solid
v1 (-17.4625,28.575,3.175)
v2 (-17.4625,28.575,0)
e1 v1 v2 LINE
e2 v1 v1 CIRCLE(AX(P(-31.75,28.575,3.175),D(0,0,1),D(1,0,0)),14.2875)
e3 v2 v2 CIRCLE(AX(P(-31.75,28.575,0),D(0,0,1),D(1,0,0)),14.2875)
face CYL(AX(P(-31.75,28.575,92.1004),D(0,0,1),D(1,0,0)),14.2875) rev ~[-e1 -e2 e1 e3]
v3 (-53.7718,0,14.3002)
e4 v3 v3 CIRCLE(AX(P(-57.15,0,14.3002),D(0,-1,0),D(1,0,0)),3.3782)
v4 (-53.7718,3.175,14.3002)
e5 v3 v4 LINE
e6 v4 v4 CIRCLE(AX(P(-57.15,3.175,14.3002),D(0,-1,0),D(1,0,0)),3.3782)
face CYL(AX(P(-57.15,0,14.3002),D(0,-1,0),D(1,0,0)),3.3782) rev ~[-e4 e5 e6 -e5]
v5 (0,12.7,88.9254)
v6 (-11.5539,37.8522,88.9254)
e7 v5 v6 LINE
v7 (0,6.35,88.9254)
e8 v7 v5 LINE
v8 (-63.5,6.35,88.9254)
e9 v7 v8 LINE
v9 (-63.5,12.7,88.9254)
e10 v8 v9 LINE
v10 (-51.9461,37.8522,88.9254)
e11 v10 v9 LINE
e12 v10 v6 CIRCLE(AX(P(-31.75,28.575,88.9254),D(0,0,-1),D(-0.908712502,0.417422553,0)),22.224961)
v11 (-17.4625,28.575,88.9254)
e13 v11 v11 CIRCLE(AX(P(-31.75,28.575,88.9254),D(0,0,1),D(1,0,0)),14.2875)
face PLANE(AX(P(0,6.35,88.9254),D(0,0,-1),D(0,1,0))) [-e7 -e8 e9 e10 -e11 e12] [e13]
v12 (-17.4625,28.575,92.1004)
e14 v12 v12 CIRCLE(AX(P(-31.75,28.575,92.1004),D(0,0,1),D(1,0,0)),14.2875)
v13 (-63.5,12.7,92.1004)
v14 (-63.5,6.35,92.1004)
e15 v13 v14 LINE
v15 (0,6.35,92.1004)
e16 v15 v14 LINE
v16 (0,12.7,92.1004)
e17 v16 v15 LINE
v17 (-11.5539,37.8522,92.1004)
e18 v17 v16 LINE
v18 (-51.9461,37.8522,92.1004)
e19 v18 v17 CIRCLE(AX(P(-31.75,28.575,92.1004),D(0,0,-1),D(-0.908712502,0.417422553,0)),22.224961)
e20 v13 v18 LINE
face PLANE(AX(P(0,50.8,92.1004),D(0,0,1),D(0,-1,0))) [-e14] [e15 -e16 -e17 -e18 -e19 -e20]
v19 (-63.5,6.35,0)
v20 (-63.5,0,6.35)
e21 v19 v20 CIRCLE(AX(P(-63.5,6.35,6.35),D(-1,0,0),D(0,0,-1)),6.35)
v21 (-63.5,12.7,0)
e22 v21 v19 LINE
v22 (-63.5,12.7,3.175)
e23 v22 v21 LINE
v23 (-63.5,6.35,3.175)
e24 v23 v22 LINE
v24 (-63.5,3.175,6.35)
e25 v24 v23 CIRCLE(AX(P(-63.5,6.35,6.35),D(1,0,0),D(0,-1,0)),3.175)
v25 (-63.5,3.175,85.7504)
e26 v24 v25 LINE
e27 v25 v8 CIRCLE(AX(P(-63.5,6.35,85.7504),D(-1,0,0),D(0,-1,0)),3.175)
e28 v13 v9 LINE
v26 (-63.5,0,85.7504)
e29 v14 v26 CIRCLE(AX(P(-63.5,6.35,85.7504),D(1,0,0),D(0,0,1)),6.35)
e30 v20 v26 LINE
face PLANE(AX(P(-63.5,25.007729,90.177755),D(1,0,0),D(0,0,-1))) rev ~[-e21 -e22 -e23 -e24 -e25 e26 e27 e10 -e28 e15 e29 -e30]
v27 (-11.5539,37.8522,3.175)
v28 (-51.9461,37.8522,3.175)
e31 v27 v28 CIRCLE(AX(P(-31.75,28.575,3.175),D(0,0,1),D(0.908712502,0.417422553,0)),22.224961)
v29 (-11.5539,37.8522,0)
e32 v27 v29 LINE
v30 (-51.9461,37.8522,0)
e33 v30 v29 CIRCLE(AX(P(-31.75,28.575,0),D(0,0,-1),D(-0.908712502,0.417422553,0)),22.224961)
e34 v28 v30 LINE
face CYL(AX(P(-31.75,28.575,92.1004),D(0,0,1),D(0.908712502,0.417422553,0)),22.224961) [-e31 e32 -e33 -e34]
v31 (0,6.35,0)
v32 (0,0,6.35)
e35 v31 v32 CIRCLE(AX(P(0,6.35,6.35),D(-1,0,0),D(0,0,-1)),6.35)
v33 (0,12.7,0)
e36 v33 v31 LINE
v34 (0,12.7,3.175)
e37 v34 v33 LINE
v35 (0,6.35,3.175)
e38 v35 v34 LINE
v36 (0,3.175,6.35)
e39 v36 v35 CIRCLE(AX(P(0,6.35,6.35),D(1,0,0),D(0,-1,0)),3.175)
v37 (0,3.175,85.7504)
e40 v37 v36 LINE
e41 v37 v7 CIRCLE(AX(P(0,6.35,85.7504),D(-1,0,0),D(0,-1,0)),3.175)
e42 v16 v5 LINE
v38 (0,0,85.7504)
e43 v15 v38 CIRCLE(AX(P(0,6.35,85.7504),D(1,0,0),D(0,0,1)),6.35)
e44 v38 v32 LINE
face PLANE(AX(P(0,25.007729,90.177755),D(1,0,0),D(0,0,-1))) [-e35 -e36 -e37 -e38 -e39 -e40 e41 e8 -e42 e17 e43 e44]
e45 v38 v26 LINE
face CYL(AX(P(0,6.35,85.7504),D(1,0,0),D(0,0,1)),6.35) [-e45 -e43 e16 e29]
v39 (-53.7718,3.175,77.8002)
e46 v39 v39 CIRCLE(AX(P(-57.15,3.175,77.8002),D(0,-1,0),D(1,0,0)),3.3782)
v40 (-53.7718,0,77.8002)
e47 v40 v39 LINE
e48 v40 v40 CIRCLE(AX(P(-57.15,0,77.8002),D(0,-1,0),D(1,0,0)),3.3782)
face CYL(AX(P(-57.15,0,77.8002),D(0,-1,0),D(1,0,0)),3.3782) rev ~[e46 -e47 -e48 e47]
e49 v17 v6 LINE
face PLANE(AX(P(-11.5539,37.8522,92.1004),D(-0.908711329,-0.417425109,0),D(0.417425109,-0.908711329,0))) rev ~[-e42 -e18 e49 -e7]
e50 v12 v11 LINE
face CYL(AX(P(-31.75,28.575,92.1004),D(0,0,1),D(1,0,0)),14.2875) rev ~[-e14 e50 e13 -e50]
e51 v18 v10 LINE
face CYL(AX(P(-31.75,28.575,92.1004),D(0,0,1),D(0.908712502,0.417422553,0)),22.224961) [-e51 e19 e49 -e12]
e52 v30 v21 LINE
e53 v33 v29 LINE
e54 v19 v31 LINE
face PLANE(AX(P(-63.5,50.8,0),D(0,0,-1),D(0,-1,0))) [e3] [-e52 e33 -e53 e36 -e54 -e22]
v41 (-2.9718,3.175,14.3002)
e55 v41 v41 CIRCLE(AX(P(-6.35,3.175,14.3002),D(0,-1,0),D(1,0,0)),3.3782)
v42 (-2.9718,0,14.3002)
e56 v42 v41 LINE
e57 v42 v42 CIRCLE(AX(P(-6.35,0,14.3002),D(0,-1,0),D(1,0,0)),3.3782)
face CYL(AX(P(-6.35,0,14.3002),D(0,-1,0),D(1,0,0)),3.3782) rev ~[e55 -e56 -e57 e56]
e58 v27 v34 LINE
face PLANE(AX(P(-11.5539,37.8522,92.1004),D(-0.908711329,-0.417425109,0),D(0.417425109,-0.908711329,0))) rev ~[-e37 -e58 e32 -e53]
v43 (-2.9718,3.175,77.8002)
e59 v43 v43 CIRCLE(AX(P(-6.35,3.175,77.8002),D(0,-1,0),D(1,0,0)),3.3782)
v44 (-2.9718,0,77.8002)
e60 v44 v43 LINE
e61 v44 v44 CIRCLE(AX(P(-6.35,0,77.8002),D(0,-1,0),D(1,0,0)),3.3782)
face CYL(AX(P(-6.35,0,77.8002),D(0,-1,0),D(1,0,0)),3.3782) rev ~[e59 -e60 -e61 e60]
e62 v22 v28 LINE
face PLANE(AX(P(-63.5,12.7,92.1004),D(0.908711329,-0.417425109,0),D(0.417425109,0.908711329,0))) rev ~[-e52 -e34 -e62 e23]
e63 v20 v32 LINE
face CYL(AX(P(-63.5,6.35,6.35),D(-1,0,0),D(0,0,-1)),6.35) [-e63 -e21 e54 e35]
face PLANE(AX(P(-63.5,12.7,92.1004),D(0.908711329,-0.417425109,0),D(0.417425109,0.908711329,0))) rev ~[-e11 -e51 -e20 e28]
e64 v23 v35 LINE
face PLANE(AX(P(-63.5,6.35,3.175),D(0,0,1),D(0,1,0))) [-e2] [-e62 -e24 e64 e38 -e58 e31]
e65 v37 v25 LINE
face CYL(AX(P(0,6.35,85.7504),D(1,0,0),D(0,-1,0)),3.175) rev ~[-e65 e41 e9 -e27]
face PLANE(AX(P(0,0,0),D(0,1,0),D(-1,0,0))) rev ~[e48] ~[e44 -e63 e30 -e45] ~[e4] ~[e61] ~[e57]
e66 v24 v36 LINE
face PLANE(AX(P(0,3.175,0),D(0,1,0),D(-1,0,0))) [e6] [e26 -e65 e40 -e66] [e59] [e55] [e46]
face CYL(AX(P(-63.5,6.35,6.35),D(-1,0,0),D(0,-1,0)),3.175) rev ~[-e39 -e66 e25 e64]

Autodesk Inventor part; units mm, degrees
ref_plane "YZ Plane" through (0, 0, 0) normal (1, 0, 0) x (0, 1, 0)
ref_plane "XZ Plane" through (0, 0, 0) normal (0, 1, 0) x (-1, 0, 0)
ref_plane "XY Plane" through (0, 0, 0) normal (0, 0, 1) x (1, 0, 0)
sketch "Sketch1" plane through (0, 0, 0) normal (0, 1, 0) x (-1, 0, 0)
  line L0 (0, 0) -> (63.5, 0)
  line L1 (63.5, 0) -> (63.5, 92.1004)
  line L2 (63.5, 92.1004) -> (0, 92.1004)
  line L3 (0, 92.1004) -> (0, 0)
  dimension "d0" = 92.1004
  dimension "d2" = 63.5
extrude "Plate1" add sketch "Sketch1" along normal blind 3.175
sketch "Sketch2" plane through (0, 0, 88.9254) normal (0, 0, 1) x (1, 0, 0)
  line L0 (-63.5, 0) -> (0, 0)
  line L1 (0, 0) -> (0, 50.8)
  line L2 (0, 50.8) -> (-63.5, 50.8)
  line L3 (-63.5, 50.8) -> (-63.5, 0)
edge flange "Flange1" height 50.8 angle 90 thickness 3.175 bend radius 3.175 thickness toward (0, 0, 1) relief tear relief width 3.175 relief depth 1.5875 corner gap 3.175 corner form 0 edges at (-31.75, 3.175, 92.1004) (-31.75, 3.175, 0) wall of the first edge with corners at (-63.5, 0, 88.9254) (0, 0, 88.9254) (0, 50.8, 88.9254) (-63.5, 50.8, 88.9254)
bend "Bend1"
corner "Corner1"
sketch "Sketch3" plane through (-63.5, 50.8, 92.1004) normal (0, 0, 1) x (1, 0, 0)
  line L0 (0, -44.45) -> (63.5, -44.45) projected
  line L1 (63.5, 0) -> (63.5, -44.45) projected
  line L2 (0, 0) -> (63.5, 0) projected
  line L3 (0, -44.45) -> (0, 0) projected
  circle A0 centre (31.75, -22.225) radius 14.2875
  arc A1 (51.9461, -12.9478) -> (11.5539, -12.9478) centre (31.75, -22.225) ccw
  line L4 (0, -38.1) -> (11.5539, -12.9478)
  line L5 (51.9461, -12.9478) -> (63.5, -38.1)
  point P0 (63.5, -50.8)
  dimension "d14" = 28.575
  dimension "d15" = 6.35
  dimension "d16" = 28.575
  dimension "d17" = 44.45
  dimension "d18" = 31.75
  dimension "d19" = 6.35
extrude "Cut1" cut sketch "Sketch3" against normal blind 2540 contours L3 L2 A1 L4 | L5 A1 L2 L1 | A0
sketch "Sketch4" plane through (0, 0, 0) normal (0, -1, 0) x (1, 0, 0)
  line L0 (0, 85.7504) -> (0, 6.35) projected
  line L1 (-63.5, 6.35) -> (-63.5, 85.7504) projected
  circle A0 centre (-57.15, 77.8002) radius 3.3782
  circle A1 centre (-6.35, 77.8002) radius 3.3782
  circle A2 centre (-57.15, 14.3002) radius 3.3782
  circle A3 centre (-6.35, 14.3002) radius 3.3782
  line L2 (-63.5, 46.0502) -> (0, 46.0502)
  point P0 (0, 0)
  dimension "d22" = 6.7564
  dimension "d23" = 6.7564
  dimension "d24" = 6.7564
  dimension "d25" = 6.7564
  dimension "d26" = 31.75
  dimension "d27" = 31.75
  dimension "d28" = 31.75
  dimension "d29" = 31.75
  dimension "d30" = 6.35
  dimension "d31" = 6.35
  dimension "d32" = 6.35
  dimension "d33" = 6.35
extrude "Cut2" cut sketch "Sketch4" against normal blind 3.175
equation "\"d34\" = Thickness"
equation "\"d4\" = BendReliefWidth"
equation "\"d5\" = BendReliefDepth"
equation "\"d6\" = MinimumRemnant"
equation "\"d7\" = BendRadius"
equation "\"d10\" = BendRadius"
equation "\"d11\" = CornerReliefSize"
equation "\"d12\" = GapSize"
equation "\"d13\" = JacobiRadiusSize"
equation "\"BendRadius\" = Thickness"
equation "\"BendReliefWidth\" = Thickness"
equation "\"BendReliefDepth\" = 0.5 * Thickness"
equation "\"CornerReliefSize\" = 4 * Thickness"
equation "\"MinimumRemnant\" = 2 * Thickness"
equation "\"TransitionRadius\" = BendRadius"
equation "\"JacobiRadiusSize\" = BendRadius"
equation "\"GapSize\" = Thickness"
equation "\"d3\" = BendRadius"
equation "\"Thickness\" = 3.175"
properties part number "Bearing Mount 5" material "Aluminum 6061"
